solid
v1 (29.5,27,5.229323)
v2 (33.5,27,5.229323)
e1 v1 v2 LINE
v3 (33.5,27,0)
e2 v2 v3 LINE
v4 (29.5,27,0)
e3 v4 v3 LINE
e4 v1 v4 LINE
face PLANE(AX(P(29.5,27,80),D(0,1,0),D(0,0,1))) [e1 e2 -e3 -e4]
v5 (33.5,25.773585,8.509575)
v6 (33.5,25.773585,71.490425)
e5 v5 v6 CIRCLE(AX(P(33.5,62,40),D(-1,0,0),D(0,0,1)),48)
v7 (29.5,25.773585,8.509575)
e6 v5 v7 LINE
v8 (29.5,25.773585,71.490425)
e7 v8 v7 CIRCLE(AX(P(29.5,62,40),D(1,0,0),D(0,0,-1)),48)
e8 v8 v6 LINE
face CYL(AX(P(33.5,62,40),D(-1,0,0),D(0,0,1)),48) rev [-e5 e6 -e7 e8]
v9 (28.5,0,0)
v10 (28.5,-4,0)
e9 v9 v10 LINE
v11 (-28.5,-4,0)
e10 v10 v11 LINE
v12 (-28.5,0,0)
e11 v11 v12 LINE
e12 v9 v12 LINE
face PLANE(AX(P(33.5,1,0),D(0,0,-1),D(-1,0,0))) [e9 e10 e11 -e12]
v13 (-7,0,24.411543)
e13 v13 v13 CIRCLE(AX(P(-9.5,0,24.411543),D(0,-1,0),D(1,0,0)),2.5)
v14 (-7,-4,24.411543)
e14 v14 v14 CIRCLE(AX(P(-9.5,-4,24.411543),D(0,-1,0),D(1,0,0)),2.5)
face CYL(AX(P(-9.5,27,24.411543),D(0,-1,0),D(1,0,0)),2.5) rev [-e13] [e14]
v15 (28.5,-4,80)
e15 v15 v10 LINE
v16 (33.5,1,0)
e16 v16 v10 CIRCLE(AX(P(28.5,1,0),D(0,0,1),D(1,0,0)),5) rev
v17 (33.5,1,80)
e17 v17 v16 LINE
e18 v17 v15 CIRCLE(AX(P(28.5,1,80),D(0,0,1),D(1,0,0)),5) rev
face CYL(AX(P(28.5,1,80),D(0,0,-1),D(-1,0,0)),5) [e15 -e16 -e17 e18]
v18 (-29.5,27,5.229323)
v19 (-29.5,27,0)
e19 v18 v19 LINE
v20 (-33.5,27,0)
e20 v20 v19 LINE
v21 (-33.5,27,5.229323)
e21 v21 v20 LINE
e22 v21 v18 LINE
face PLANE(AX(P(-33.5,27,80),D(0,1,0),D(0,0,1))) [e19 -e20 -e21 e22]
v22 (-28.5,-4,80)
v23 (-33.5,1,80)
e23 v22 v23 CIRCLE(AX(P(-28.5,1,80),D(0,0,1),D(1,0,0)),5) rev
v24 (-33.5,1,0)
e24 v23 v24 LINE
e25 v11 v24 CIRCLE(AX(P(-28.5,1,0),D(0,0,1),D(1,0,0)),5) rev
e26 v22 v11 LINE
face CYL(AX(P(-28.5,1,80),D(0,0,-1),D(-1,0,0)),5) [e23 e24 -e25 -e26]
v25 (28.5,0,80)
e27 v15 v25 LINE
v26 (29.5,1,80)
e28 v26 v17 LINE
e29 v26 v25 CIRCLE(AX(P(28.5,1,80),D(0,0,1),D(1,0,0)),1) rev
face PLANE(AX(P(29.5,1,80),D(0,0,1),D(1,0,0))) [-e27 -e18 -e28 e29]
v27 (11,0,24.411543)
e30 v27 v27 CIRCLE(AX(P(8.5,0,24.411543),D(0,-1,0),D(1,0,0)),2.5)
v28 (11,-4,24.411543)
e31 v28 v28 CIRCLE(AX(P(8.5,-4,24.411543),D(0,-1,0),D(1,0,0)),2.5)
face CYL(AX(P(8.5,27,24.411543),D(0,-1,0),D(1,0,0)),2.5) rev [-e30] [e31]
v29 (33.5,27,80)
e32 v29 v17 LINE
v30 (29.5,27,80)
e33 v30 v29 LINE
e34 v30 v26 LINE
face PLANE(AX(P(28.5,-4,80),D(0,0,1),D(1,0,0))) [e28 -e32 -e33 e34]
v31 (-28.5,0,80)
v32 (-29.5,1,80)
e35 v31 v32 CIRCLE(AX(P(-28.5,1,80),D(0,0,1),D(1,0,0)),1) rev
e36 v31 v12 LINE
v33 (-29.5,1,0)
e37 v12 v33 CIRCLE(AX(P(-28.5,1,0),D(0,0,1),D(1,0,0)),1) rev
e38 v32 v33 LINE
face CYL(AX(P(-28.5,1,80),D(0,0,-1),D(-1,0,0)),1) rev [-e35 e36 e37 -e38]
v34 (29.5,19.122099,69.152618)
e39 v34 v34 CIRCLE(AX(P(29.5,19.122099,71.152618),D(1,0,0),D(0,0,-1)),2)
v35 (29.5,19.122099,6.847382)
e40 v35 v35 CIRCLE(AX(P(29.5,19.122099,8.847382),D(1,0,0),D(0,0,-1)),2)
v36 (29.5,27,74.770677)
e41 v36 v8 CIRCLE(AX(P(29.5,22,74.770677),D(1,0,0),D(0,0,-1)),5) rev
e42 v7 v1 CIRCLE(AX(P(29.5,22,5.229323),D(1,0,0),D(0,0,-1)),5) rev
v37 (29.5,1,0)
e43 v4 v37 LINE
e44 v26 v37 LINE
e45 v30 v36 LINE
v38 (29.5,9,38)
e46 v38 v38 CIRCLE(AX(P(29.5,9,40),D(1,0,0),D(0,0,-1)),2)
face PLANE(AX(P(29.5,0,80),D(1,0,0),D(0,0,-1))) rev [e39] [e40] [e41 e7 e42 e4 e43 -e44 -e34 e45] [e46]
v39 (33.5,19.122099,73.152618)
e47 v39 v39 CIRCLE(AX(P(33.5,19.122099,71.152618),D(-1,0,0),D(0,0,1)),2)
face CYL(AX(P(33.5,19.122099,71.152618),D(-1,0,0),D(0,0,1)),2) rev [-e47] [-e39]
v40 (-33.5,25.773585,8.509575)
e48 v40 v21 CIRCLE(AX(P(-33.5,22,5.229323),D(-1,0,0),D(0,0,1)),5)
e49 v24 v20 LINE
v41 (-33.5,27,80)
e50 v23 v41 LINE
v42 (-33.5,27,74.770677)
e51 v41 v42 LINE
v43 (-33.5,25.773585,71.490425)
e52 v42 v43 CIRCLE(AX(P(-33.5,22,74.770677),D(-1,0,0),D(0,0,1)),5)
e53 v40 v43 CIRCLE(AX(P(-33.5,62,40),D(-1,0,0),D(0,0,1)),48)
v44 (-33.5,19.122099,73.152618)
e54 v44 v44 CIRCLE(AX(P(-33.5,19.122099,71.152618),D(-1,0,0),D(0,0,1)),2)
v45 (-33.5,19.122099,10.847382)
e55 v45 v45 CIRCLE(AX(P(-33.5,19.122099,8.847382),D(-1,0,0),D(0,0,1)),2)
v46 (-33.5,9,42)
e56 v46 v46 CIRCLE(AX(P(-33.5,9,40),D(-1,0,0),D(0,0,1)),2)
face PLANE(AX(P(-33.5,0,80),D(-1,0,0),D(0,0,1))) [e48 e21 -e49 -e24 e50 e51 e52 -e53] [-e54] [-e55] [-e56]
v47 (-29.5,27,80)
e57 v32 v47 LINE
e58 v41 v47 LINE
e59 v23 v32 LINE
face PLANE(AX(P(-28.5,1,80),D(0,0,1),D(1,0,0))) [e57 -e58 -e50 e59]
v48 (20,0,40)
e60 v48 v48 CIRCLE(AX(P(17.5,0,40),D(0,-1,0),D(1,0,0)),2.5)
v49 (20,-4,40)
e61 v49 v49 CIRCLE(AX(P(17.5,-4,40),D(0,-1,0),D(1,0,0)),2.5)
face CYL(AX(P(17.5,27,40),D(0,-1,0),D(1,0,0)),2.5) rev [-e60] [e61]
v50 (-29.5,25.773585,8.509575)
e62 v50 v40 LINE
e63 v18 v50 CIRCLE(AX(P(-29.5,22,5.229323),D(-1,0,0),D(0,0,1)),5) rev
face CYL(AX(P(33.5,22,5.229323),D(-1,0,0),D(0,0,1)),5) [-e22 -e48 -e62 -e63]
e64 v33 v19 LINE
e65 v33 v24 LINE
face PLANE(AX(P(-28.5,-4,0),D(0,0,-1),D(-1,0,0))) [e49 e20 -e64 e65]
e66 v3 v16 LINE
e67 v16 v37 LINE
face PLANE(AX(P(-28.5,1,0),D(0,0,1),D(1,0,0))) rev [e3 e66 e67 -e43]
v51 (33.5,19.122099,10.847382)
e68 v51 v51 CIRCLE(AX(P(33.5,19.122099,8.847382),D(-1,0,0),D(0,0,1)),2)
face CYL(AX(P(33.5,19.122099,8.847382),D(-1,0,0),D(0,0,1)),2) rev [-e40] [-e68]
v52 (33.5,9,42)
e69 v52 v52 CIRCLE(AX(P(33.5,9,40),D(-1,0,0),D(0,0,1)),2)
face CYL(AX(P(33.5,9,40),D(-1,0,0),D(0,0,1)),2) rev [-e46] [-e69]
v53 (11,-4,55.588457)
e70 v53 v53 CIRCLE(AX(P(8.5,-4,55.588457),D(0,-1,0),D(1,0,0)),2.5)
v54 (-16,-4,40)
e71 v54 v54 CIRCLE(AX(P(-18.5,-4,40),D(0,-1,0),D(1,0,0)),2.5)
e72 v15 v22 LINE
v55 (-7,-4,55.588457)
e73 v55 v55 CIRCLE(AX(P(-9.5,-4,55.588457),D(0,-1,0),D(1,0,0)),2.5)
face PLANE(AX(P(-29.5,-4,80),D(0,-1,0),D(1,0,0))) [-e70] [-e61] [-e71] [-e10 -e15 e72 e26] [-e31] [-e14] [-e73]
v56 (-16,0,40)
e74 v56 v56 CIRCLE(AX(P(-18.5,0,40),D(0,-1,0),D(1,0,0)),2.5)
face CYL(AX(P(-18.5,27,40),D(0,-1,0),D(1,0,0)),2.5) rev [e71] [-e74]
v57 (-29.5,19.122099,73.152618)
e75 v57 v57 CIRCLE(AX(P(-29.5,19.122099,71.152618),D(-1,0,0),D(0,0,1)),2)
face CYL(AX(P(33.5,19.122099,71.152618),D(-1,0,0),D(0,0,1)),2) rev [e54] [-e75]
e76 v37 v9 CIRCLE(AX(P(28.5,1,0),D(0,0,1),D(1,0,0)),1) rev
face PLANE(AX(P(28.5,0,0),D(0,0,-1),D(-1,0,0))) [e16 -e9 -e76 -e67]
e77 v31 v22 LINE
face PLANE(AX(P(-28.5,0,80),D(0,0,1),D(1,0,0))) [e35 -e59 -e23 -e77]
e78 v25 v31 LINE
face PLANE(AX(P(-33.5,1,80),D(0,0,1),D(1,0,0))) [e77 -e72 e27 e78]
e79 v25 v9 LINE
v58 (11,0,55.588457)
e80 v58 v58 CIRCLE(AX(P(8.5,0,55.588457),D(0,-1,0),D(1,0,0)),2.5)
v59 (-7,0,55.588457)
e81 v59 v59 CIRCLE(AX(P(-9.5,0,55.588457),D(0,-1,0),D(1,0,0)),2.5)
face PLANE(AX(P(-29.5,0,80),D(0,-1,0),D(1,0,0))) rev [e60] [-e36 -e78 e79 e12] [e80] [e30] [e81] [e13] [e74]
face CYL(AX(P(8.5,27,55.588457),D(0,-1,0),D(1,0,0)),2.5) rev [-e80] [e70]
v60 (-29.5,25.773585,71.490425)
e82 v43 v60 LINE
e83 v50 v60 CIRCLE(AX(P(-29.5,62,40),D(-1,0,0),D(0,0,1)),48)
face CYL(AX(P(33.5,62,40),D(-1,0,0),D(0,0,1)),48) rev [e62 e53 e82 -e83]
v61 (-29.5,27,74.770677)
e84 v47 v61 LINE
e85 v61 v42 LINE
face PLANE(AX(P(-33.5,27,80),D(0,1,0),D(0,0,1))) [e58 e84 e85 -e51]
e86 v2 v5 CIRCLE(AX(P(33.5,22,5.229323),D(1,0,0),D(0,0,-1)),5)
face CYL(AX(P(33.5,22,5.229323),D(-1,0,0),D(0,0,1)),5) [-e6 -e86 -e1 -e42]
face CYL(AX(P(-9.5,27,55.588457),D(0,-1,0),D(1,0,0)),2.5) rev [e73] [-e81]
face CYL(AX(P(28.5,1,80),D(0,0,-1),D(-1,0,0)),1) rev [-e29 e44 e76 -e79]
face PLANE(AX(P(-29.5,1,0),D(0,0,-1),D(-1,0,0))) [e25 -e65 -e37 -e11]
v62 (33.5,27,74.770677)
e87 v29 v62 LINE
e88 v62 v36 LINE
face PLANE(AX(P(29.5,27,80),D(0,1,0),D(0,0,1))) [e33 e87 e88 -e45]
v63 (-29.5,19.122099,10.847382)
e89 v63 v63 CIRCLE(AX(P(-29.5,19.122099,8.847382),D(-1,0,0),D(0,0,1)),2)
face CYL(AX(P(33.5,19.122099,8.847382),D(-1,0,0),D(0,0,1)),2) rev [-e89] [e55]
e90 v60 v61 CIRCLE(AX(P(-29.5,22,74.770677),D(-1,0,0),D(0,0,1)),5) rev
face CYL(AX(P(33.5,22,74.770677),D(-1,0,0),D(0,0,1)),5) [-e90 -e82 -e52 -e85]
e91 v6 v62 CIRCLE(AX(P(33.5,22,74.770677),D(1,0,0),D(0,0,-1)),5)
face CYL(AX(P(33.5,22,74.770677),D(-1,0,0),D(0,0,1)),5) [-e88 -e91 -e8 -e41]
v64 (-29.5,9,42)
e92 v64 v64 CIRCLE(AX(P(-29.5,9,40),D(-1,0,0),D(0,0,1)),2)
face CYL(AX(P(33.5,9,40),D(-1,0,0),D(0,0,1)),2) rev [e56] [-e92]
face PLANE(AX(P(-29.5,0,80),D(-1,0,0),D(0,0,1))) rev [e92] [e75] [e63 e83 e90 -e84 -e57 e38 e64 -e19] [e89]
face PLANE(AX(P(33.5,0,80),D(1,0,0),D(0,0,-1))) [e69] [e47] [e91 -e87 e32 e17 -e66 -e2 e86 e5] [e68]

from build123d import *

# Parameters (mm, degrees)
SM_BASE_FLANGE_1_DEPTH   = 80
CUT_EXTRUDE_3_DEPTH      = 108.786826653
CUT_EXTRUDE_3_DEPTH_BACK = 108.786826653
SKETCH_6_R               = 48
SKETCH_6_R_2             = 2
FILLET_1_R               = 5
SKETCH_9_R               = 2.5
CUT_EXTRUDE_4_DEPTH      = 93.104560148


# Sheet-metal steps are written as plain solids
with BuildPart() as part:
    # Sketch 1 → Базовая кромка1 (new body)
    with BuildSketch(Plane.XY):
        with BuildLine():
            Line((-29.5, 27), (-29.5, 1))
            ThreePointArc((-29.5, 1), (-29.207106781, 0.292893219), (-28.5, 0))
            Line((-28.5, 0), (28.5, 0))
            ThreePointArc((28.5, 0), (29.207106781, 0.292893219), (29.5, 1))
            Line((29.5, 1), (29.5, 27))
            Line((29.5, 27), (33.5, 27))
            Line((33.5, 27), (33.5, 1))
            ThreePointArc((33.5, 1), (32.035533906, -2.535533906), (28.5, -4))
            Line((28.5, -4), (-28.5, -4))
            ThreePointArc((-28.5, -4), (-32.035533906, -2.535533906), (-33.5, 1))
            Line((-33.5, 1), (-33.5, 27))
            Line((-33.5, 27), (-29.5, 27))
        make_face()
    extrude(amount=SM_BASE_FLANGE_1_DEPTH)

    # Эскиз6 → Вырез-Вытянуть3 (cut, two sides: drawn at the far end of the back side and taken through both)
    with BuildSketch(Plane.ZY.offset(33.5).offset(-CUT_EXTRUDE_3_DEPTH_BACK)):
        with Locations((40, 62)):
            Circle(SKETCH_6_R)
        with Locations((40, 9)):
            Circle(SKETCH_6_R_2)
        with Locations((8.847381628, 19.122099298)):
            Circle(SKETCH_6_R_2)
        with Locations((71.152618372, 19.122099298)):
            Circle(SKETCH_6_R_2)
    extrude(amount=CUT_EXTRUDE_3_DEPTH + CUT_EXTRUDE_3_DEPTH_BACK, mode=Mode.SUBTRACT)

    # Скругление1
    fillet_1_edges = [part.edges().sort_by_distance(p)[0] for p in [
        (31.5, 27, 7.151864589),
        (31.5, 27, 72.848135411),
        (-31.5, 27, 7.151864589),
        (-31.5, 27, 72.848135411),
    ]]
    fillet(fillet_1_edges, radius=FILLET_1_R)

    # Эскиз9 → Вырез-Вытянуть4 (cut, through all)
    with BuildSketch(Plane.XZ.offset(4)):
        with Locations((17.5, 40)):
            Circle(SKETCH_9_R)
        with Locations((8.5, 24.411542732)):
            Circle(SKETCH_9_R)
        with Locations((-9.5, 24.411542732)):
            Circle(SKETCH_9_R)
        with Locations((-18.5, 40)):
            Circle(SKETCH_9_R)
        with Locations((-9.5, 55.588457268)):
            Circle(SKETCH_9_R)
        with Locations((8.5, 55.588457268)):
            Circle(SKETCH_9_R)
    extrude(amount=-CUT_EXTRUDE_4_DEPTH, mode=Mode.SUBTRACT)


solid = part.part
